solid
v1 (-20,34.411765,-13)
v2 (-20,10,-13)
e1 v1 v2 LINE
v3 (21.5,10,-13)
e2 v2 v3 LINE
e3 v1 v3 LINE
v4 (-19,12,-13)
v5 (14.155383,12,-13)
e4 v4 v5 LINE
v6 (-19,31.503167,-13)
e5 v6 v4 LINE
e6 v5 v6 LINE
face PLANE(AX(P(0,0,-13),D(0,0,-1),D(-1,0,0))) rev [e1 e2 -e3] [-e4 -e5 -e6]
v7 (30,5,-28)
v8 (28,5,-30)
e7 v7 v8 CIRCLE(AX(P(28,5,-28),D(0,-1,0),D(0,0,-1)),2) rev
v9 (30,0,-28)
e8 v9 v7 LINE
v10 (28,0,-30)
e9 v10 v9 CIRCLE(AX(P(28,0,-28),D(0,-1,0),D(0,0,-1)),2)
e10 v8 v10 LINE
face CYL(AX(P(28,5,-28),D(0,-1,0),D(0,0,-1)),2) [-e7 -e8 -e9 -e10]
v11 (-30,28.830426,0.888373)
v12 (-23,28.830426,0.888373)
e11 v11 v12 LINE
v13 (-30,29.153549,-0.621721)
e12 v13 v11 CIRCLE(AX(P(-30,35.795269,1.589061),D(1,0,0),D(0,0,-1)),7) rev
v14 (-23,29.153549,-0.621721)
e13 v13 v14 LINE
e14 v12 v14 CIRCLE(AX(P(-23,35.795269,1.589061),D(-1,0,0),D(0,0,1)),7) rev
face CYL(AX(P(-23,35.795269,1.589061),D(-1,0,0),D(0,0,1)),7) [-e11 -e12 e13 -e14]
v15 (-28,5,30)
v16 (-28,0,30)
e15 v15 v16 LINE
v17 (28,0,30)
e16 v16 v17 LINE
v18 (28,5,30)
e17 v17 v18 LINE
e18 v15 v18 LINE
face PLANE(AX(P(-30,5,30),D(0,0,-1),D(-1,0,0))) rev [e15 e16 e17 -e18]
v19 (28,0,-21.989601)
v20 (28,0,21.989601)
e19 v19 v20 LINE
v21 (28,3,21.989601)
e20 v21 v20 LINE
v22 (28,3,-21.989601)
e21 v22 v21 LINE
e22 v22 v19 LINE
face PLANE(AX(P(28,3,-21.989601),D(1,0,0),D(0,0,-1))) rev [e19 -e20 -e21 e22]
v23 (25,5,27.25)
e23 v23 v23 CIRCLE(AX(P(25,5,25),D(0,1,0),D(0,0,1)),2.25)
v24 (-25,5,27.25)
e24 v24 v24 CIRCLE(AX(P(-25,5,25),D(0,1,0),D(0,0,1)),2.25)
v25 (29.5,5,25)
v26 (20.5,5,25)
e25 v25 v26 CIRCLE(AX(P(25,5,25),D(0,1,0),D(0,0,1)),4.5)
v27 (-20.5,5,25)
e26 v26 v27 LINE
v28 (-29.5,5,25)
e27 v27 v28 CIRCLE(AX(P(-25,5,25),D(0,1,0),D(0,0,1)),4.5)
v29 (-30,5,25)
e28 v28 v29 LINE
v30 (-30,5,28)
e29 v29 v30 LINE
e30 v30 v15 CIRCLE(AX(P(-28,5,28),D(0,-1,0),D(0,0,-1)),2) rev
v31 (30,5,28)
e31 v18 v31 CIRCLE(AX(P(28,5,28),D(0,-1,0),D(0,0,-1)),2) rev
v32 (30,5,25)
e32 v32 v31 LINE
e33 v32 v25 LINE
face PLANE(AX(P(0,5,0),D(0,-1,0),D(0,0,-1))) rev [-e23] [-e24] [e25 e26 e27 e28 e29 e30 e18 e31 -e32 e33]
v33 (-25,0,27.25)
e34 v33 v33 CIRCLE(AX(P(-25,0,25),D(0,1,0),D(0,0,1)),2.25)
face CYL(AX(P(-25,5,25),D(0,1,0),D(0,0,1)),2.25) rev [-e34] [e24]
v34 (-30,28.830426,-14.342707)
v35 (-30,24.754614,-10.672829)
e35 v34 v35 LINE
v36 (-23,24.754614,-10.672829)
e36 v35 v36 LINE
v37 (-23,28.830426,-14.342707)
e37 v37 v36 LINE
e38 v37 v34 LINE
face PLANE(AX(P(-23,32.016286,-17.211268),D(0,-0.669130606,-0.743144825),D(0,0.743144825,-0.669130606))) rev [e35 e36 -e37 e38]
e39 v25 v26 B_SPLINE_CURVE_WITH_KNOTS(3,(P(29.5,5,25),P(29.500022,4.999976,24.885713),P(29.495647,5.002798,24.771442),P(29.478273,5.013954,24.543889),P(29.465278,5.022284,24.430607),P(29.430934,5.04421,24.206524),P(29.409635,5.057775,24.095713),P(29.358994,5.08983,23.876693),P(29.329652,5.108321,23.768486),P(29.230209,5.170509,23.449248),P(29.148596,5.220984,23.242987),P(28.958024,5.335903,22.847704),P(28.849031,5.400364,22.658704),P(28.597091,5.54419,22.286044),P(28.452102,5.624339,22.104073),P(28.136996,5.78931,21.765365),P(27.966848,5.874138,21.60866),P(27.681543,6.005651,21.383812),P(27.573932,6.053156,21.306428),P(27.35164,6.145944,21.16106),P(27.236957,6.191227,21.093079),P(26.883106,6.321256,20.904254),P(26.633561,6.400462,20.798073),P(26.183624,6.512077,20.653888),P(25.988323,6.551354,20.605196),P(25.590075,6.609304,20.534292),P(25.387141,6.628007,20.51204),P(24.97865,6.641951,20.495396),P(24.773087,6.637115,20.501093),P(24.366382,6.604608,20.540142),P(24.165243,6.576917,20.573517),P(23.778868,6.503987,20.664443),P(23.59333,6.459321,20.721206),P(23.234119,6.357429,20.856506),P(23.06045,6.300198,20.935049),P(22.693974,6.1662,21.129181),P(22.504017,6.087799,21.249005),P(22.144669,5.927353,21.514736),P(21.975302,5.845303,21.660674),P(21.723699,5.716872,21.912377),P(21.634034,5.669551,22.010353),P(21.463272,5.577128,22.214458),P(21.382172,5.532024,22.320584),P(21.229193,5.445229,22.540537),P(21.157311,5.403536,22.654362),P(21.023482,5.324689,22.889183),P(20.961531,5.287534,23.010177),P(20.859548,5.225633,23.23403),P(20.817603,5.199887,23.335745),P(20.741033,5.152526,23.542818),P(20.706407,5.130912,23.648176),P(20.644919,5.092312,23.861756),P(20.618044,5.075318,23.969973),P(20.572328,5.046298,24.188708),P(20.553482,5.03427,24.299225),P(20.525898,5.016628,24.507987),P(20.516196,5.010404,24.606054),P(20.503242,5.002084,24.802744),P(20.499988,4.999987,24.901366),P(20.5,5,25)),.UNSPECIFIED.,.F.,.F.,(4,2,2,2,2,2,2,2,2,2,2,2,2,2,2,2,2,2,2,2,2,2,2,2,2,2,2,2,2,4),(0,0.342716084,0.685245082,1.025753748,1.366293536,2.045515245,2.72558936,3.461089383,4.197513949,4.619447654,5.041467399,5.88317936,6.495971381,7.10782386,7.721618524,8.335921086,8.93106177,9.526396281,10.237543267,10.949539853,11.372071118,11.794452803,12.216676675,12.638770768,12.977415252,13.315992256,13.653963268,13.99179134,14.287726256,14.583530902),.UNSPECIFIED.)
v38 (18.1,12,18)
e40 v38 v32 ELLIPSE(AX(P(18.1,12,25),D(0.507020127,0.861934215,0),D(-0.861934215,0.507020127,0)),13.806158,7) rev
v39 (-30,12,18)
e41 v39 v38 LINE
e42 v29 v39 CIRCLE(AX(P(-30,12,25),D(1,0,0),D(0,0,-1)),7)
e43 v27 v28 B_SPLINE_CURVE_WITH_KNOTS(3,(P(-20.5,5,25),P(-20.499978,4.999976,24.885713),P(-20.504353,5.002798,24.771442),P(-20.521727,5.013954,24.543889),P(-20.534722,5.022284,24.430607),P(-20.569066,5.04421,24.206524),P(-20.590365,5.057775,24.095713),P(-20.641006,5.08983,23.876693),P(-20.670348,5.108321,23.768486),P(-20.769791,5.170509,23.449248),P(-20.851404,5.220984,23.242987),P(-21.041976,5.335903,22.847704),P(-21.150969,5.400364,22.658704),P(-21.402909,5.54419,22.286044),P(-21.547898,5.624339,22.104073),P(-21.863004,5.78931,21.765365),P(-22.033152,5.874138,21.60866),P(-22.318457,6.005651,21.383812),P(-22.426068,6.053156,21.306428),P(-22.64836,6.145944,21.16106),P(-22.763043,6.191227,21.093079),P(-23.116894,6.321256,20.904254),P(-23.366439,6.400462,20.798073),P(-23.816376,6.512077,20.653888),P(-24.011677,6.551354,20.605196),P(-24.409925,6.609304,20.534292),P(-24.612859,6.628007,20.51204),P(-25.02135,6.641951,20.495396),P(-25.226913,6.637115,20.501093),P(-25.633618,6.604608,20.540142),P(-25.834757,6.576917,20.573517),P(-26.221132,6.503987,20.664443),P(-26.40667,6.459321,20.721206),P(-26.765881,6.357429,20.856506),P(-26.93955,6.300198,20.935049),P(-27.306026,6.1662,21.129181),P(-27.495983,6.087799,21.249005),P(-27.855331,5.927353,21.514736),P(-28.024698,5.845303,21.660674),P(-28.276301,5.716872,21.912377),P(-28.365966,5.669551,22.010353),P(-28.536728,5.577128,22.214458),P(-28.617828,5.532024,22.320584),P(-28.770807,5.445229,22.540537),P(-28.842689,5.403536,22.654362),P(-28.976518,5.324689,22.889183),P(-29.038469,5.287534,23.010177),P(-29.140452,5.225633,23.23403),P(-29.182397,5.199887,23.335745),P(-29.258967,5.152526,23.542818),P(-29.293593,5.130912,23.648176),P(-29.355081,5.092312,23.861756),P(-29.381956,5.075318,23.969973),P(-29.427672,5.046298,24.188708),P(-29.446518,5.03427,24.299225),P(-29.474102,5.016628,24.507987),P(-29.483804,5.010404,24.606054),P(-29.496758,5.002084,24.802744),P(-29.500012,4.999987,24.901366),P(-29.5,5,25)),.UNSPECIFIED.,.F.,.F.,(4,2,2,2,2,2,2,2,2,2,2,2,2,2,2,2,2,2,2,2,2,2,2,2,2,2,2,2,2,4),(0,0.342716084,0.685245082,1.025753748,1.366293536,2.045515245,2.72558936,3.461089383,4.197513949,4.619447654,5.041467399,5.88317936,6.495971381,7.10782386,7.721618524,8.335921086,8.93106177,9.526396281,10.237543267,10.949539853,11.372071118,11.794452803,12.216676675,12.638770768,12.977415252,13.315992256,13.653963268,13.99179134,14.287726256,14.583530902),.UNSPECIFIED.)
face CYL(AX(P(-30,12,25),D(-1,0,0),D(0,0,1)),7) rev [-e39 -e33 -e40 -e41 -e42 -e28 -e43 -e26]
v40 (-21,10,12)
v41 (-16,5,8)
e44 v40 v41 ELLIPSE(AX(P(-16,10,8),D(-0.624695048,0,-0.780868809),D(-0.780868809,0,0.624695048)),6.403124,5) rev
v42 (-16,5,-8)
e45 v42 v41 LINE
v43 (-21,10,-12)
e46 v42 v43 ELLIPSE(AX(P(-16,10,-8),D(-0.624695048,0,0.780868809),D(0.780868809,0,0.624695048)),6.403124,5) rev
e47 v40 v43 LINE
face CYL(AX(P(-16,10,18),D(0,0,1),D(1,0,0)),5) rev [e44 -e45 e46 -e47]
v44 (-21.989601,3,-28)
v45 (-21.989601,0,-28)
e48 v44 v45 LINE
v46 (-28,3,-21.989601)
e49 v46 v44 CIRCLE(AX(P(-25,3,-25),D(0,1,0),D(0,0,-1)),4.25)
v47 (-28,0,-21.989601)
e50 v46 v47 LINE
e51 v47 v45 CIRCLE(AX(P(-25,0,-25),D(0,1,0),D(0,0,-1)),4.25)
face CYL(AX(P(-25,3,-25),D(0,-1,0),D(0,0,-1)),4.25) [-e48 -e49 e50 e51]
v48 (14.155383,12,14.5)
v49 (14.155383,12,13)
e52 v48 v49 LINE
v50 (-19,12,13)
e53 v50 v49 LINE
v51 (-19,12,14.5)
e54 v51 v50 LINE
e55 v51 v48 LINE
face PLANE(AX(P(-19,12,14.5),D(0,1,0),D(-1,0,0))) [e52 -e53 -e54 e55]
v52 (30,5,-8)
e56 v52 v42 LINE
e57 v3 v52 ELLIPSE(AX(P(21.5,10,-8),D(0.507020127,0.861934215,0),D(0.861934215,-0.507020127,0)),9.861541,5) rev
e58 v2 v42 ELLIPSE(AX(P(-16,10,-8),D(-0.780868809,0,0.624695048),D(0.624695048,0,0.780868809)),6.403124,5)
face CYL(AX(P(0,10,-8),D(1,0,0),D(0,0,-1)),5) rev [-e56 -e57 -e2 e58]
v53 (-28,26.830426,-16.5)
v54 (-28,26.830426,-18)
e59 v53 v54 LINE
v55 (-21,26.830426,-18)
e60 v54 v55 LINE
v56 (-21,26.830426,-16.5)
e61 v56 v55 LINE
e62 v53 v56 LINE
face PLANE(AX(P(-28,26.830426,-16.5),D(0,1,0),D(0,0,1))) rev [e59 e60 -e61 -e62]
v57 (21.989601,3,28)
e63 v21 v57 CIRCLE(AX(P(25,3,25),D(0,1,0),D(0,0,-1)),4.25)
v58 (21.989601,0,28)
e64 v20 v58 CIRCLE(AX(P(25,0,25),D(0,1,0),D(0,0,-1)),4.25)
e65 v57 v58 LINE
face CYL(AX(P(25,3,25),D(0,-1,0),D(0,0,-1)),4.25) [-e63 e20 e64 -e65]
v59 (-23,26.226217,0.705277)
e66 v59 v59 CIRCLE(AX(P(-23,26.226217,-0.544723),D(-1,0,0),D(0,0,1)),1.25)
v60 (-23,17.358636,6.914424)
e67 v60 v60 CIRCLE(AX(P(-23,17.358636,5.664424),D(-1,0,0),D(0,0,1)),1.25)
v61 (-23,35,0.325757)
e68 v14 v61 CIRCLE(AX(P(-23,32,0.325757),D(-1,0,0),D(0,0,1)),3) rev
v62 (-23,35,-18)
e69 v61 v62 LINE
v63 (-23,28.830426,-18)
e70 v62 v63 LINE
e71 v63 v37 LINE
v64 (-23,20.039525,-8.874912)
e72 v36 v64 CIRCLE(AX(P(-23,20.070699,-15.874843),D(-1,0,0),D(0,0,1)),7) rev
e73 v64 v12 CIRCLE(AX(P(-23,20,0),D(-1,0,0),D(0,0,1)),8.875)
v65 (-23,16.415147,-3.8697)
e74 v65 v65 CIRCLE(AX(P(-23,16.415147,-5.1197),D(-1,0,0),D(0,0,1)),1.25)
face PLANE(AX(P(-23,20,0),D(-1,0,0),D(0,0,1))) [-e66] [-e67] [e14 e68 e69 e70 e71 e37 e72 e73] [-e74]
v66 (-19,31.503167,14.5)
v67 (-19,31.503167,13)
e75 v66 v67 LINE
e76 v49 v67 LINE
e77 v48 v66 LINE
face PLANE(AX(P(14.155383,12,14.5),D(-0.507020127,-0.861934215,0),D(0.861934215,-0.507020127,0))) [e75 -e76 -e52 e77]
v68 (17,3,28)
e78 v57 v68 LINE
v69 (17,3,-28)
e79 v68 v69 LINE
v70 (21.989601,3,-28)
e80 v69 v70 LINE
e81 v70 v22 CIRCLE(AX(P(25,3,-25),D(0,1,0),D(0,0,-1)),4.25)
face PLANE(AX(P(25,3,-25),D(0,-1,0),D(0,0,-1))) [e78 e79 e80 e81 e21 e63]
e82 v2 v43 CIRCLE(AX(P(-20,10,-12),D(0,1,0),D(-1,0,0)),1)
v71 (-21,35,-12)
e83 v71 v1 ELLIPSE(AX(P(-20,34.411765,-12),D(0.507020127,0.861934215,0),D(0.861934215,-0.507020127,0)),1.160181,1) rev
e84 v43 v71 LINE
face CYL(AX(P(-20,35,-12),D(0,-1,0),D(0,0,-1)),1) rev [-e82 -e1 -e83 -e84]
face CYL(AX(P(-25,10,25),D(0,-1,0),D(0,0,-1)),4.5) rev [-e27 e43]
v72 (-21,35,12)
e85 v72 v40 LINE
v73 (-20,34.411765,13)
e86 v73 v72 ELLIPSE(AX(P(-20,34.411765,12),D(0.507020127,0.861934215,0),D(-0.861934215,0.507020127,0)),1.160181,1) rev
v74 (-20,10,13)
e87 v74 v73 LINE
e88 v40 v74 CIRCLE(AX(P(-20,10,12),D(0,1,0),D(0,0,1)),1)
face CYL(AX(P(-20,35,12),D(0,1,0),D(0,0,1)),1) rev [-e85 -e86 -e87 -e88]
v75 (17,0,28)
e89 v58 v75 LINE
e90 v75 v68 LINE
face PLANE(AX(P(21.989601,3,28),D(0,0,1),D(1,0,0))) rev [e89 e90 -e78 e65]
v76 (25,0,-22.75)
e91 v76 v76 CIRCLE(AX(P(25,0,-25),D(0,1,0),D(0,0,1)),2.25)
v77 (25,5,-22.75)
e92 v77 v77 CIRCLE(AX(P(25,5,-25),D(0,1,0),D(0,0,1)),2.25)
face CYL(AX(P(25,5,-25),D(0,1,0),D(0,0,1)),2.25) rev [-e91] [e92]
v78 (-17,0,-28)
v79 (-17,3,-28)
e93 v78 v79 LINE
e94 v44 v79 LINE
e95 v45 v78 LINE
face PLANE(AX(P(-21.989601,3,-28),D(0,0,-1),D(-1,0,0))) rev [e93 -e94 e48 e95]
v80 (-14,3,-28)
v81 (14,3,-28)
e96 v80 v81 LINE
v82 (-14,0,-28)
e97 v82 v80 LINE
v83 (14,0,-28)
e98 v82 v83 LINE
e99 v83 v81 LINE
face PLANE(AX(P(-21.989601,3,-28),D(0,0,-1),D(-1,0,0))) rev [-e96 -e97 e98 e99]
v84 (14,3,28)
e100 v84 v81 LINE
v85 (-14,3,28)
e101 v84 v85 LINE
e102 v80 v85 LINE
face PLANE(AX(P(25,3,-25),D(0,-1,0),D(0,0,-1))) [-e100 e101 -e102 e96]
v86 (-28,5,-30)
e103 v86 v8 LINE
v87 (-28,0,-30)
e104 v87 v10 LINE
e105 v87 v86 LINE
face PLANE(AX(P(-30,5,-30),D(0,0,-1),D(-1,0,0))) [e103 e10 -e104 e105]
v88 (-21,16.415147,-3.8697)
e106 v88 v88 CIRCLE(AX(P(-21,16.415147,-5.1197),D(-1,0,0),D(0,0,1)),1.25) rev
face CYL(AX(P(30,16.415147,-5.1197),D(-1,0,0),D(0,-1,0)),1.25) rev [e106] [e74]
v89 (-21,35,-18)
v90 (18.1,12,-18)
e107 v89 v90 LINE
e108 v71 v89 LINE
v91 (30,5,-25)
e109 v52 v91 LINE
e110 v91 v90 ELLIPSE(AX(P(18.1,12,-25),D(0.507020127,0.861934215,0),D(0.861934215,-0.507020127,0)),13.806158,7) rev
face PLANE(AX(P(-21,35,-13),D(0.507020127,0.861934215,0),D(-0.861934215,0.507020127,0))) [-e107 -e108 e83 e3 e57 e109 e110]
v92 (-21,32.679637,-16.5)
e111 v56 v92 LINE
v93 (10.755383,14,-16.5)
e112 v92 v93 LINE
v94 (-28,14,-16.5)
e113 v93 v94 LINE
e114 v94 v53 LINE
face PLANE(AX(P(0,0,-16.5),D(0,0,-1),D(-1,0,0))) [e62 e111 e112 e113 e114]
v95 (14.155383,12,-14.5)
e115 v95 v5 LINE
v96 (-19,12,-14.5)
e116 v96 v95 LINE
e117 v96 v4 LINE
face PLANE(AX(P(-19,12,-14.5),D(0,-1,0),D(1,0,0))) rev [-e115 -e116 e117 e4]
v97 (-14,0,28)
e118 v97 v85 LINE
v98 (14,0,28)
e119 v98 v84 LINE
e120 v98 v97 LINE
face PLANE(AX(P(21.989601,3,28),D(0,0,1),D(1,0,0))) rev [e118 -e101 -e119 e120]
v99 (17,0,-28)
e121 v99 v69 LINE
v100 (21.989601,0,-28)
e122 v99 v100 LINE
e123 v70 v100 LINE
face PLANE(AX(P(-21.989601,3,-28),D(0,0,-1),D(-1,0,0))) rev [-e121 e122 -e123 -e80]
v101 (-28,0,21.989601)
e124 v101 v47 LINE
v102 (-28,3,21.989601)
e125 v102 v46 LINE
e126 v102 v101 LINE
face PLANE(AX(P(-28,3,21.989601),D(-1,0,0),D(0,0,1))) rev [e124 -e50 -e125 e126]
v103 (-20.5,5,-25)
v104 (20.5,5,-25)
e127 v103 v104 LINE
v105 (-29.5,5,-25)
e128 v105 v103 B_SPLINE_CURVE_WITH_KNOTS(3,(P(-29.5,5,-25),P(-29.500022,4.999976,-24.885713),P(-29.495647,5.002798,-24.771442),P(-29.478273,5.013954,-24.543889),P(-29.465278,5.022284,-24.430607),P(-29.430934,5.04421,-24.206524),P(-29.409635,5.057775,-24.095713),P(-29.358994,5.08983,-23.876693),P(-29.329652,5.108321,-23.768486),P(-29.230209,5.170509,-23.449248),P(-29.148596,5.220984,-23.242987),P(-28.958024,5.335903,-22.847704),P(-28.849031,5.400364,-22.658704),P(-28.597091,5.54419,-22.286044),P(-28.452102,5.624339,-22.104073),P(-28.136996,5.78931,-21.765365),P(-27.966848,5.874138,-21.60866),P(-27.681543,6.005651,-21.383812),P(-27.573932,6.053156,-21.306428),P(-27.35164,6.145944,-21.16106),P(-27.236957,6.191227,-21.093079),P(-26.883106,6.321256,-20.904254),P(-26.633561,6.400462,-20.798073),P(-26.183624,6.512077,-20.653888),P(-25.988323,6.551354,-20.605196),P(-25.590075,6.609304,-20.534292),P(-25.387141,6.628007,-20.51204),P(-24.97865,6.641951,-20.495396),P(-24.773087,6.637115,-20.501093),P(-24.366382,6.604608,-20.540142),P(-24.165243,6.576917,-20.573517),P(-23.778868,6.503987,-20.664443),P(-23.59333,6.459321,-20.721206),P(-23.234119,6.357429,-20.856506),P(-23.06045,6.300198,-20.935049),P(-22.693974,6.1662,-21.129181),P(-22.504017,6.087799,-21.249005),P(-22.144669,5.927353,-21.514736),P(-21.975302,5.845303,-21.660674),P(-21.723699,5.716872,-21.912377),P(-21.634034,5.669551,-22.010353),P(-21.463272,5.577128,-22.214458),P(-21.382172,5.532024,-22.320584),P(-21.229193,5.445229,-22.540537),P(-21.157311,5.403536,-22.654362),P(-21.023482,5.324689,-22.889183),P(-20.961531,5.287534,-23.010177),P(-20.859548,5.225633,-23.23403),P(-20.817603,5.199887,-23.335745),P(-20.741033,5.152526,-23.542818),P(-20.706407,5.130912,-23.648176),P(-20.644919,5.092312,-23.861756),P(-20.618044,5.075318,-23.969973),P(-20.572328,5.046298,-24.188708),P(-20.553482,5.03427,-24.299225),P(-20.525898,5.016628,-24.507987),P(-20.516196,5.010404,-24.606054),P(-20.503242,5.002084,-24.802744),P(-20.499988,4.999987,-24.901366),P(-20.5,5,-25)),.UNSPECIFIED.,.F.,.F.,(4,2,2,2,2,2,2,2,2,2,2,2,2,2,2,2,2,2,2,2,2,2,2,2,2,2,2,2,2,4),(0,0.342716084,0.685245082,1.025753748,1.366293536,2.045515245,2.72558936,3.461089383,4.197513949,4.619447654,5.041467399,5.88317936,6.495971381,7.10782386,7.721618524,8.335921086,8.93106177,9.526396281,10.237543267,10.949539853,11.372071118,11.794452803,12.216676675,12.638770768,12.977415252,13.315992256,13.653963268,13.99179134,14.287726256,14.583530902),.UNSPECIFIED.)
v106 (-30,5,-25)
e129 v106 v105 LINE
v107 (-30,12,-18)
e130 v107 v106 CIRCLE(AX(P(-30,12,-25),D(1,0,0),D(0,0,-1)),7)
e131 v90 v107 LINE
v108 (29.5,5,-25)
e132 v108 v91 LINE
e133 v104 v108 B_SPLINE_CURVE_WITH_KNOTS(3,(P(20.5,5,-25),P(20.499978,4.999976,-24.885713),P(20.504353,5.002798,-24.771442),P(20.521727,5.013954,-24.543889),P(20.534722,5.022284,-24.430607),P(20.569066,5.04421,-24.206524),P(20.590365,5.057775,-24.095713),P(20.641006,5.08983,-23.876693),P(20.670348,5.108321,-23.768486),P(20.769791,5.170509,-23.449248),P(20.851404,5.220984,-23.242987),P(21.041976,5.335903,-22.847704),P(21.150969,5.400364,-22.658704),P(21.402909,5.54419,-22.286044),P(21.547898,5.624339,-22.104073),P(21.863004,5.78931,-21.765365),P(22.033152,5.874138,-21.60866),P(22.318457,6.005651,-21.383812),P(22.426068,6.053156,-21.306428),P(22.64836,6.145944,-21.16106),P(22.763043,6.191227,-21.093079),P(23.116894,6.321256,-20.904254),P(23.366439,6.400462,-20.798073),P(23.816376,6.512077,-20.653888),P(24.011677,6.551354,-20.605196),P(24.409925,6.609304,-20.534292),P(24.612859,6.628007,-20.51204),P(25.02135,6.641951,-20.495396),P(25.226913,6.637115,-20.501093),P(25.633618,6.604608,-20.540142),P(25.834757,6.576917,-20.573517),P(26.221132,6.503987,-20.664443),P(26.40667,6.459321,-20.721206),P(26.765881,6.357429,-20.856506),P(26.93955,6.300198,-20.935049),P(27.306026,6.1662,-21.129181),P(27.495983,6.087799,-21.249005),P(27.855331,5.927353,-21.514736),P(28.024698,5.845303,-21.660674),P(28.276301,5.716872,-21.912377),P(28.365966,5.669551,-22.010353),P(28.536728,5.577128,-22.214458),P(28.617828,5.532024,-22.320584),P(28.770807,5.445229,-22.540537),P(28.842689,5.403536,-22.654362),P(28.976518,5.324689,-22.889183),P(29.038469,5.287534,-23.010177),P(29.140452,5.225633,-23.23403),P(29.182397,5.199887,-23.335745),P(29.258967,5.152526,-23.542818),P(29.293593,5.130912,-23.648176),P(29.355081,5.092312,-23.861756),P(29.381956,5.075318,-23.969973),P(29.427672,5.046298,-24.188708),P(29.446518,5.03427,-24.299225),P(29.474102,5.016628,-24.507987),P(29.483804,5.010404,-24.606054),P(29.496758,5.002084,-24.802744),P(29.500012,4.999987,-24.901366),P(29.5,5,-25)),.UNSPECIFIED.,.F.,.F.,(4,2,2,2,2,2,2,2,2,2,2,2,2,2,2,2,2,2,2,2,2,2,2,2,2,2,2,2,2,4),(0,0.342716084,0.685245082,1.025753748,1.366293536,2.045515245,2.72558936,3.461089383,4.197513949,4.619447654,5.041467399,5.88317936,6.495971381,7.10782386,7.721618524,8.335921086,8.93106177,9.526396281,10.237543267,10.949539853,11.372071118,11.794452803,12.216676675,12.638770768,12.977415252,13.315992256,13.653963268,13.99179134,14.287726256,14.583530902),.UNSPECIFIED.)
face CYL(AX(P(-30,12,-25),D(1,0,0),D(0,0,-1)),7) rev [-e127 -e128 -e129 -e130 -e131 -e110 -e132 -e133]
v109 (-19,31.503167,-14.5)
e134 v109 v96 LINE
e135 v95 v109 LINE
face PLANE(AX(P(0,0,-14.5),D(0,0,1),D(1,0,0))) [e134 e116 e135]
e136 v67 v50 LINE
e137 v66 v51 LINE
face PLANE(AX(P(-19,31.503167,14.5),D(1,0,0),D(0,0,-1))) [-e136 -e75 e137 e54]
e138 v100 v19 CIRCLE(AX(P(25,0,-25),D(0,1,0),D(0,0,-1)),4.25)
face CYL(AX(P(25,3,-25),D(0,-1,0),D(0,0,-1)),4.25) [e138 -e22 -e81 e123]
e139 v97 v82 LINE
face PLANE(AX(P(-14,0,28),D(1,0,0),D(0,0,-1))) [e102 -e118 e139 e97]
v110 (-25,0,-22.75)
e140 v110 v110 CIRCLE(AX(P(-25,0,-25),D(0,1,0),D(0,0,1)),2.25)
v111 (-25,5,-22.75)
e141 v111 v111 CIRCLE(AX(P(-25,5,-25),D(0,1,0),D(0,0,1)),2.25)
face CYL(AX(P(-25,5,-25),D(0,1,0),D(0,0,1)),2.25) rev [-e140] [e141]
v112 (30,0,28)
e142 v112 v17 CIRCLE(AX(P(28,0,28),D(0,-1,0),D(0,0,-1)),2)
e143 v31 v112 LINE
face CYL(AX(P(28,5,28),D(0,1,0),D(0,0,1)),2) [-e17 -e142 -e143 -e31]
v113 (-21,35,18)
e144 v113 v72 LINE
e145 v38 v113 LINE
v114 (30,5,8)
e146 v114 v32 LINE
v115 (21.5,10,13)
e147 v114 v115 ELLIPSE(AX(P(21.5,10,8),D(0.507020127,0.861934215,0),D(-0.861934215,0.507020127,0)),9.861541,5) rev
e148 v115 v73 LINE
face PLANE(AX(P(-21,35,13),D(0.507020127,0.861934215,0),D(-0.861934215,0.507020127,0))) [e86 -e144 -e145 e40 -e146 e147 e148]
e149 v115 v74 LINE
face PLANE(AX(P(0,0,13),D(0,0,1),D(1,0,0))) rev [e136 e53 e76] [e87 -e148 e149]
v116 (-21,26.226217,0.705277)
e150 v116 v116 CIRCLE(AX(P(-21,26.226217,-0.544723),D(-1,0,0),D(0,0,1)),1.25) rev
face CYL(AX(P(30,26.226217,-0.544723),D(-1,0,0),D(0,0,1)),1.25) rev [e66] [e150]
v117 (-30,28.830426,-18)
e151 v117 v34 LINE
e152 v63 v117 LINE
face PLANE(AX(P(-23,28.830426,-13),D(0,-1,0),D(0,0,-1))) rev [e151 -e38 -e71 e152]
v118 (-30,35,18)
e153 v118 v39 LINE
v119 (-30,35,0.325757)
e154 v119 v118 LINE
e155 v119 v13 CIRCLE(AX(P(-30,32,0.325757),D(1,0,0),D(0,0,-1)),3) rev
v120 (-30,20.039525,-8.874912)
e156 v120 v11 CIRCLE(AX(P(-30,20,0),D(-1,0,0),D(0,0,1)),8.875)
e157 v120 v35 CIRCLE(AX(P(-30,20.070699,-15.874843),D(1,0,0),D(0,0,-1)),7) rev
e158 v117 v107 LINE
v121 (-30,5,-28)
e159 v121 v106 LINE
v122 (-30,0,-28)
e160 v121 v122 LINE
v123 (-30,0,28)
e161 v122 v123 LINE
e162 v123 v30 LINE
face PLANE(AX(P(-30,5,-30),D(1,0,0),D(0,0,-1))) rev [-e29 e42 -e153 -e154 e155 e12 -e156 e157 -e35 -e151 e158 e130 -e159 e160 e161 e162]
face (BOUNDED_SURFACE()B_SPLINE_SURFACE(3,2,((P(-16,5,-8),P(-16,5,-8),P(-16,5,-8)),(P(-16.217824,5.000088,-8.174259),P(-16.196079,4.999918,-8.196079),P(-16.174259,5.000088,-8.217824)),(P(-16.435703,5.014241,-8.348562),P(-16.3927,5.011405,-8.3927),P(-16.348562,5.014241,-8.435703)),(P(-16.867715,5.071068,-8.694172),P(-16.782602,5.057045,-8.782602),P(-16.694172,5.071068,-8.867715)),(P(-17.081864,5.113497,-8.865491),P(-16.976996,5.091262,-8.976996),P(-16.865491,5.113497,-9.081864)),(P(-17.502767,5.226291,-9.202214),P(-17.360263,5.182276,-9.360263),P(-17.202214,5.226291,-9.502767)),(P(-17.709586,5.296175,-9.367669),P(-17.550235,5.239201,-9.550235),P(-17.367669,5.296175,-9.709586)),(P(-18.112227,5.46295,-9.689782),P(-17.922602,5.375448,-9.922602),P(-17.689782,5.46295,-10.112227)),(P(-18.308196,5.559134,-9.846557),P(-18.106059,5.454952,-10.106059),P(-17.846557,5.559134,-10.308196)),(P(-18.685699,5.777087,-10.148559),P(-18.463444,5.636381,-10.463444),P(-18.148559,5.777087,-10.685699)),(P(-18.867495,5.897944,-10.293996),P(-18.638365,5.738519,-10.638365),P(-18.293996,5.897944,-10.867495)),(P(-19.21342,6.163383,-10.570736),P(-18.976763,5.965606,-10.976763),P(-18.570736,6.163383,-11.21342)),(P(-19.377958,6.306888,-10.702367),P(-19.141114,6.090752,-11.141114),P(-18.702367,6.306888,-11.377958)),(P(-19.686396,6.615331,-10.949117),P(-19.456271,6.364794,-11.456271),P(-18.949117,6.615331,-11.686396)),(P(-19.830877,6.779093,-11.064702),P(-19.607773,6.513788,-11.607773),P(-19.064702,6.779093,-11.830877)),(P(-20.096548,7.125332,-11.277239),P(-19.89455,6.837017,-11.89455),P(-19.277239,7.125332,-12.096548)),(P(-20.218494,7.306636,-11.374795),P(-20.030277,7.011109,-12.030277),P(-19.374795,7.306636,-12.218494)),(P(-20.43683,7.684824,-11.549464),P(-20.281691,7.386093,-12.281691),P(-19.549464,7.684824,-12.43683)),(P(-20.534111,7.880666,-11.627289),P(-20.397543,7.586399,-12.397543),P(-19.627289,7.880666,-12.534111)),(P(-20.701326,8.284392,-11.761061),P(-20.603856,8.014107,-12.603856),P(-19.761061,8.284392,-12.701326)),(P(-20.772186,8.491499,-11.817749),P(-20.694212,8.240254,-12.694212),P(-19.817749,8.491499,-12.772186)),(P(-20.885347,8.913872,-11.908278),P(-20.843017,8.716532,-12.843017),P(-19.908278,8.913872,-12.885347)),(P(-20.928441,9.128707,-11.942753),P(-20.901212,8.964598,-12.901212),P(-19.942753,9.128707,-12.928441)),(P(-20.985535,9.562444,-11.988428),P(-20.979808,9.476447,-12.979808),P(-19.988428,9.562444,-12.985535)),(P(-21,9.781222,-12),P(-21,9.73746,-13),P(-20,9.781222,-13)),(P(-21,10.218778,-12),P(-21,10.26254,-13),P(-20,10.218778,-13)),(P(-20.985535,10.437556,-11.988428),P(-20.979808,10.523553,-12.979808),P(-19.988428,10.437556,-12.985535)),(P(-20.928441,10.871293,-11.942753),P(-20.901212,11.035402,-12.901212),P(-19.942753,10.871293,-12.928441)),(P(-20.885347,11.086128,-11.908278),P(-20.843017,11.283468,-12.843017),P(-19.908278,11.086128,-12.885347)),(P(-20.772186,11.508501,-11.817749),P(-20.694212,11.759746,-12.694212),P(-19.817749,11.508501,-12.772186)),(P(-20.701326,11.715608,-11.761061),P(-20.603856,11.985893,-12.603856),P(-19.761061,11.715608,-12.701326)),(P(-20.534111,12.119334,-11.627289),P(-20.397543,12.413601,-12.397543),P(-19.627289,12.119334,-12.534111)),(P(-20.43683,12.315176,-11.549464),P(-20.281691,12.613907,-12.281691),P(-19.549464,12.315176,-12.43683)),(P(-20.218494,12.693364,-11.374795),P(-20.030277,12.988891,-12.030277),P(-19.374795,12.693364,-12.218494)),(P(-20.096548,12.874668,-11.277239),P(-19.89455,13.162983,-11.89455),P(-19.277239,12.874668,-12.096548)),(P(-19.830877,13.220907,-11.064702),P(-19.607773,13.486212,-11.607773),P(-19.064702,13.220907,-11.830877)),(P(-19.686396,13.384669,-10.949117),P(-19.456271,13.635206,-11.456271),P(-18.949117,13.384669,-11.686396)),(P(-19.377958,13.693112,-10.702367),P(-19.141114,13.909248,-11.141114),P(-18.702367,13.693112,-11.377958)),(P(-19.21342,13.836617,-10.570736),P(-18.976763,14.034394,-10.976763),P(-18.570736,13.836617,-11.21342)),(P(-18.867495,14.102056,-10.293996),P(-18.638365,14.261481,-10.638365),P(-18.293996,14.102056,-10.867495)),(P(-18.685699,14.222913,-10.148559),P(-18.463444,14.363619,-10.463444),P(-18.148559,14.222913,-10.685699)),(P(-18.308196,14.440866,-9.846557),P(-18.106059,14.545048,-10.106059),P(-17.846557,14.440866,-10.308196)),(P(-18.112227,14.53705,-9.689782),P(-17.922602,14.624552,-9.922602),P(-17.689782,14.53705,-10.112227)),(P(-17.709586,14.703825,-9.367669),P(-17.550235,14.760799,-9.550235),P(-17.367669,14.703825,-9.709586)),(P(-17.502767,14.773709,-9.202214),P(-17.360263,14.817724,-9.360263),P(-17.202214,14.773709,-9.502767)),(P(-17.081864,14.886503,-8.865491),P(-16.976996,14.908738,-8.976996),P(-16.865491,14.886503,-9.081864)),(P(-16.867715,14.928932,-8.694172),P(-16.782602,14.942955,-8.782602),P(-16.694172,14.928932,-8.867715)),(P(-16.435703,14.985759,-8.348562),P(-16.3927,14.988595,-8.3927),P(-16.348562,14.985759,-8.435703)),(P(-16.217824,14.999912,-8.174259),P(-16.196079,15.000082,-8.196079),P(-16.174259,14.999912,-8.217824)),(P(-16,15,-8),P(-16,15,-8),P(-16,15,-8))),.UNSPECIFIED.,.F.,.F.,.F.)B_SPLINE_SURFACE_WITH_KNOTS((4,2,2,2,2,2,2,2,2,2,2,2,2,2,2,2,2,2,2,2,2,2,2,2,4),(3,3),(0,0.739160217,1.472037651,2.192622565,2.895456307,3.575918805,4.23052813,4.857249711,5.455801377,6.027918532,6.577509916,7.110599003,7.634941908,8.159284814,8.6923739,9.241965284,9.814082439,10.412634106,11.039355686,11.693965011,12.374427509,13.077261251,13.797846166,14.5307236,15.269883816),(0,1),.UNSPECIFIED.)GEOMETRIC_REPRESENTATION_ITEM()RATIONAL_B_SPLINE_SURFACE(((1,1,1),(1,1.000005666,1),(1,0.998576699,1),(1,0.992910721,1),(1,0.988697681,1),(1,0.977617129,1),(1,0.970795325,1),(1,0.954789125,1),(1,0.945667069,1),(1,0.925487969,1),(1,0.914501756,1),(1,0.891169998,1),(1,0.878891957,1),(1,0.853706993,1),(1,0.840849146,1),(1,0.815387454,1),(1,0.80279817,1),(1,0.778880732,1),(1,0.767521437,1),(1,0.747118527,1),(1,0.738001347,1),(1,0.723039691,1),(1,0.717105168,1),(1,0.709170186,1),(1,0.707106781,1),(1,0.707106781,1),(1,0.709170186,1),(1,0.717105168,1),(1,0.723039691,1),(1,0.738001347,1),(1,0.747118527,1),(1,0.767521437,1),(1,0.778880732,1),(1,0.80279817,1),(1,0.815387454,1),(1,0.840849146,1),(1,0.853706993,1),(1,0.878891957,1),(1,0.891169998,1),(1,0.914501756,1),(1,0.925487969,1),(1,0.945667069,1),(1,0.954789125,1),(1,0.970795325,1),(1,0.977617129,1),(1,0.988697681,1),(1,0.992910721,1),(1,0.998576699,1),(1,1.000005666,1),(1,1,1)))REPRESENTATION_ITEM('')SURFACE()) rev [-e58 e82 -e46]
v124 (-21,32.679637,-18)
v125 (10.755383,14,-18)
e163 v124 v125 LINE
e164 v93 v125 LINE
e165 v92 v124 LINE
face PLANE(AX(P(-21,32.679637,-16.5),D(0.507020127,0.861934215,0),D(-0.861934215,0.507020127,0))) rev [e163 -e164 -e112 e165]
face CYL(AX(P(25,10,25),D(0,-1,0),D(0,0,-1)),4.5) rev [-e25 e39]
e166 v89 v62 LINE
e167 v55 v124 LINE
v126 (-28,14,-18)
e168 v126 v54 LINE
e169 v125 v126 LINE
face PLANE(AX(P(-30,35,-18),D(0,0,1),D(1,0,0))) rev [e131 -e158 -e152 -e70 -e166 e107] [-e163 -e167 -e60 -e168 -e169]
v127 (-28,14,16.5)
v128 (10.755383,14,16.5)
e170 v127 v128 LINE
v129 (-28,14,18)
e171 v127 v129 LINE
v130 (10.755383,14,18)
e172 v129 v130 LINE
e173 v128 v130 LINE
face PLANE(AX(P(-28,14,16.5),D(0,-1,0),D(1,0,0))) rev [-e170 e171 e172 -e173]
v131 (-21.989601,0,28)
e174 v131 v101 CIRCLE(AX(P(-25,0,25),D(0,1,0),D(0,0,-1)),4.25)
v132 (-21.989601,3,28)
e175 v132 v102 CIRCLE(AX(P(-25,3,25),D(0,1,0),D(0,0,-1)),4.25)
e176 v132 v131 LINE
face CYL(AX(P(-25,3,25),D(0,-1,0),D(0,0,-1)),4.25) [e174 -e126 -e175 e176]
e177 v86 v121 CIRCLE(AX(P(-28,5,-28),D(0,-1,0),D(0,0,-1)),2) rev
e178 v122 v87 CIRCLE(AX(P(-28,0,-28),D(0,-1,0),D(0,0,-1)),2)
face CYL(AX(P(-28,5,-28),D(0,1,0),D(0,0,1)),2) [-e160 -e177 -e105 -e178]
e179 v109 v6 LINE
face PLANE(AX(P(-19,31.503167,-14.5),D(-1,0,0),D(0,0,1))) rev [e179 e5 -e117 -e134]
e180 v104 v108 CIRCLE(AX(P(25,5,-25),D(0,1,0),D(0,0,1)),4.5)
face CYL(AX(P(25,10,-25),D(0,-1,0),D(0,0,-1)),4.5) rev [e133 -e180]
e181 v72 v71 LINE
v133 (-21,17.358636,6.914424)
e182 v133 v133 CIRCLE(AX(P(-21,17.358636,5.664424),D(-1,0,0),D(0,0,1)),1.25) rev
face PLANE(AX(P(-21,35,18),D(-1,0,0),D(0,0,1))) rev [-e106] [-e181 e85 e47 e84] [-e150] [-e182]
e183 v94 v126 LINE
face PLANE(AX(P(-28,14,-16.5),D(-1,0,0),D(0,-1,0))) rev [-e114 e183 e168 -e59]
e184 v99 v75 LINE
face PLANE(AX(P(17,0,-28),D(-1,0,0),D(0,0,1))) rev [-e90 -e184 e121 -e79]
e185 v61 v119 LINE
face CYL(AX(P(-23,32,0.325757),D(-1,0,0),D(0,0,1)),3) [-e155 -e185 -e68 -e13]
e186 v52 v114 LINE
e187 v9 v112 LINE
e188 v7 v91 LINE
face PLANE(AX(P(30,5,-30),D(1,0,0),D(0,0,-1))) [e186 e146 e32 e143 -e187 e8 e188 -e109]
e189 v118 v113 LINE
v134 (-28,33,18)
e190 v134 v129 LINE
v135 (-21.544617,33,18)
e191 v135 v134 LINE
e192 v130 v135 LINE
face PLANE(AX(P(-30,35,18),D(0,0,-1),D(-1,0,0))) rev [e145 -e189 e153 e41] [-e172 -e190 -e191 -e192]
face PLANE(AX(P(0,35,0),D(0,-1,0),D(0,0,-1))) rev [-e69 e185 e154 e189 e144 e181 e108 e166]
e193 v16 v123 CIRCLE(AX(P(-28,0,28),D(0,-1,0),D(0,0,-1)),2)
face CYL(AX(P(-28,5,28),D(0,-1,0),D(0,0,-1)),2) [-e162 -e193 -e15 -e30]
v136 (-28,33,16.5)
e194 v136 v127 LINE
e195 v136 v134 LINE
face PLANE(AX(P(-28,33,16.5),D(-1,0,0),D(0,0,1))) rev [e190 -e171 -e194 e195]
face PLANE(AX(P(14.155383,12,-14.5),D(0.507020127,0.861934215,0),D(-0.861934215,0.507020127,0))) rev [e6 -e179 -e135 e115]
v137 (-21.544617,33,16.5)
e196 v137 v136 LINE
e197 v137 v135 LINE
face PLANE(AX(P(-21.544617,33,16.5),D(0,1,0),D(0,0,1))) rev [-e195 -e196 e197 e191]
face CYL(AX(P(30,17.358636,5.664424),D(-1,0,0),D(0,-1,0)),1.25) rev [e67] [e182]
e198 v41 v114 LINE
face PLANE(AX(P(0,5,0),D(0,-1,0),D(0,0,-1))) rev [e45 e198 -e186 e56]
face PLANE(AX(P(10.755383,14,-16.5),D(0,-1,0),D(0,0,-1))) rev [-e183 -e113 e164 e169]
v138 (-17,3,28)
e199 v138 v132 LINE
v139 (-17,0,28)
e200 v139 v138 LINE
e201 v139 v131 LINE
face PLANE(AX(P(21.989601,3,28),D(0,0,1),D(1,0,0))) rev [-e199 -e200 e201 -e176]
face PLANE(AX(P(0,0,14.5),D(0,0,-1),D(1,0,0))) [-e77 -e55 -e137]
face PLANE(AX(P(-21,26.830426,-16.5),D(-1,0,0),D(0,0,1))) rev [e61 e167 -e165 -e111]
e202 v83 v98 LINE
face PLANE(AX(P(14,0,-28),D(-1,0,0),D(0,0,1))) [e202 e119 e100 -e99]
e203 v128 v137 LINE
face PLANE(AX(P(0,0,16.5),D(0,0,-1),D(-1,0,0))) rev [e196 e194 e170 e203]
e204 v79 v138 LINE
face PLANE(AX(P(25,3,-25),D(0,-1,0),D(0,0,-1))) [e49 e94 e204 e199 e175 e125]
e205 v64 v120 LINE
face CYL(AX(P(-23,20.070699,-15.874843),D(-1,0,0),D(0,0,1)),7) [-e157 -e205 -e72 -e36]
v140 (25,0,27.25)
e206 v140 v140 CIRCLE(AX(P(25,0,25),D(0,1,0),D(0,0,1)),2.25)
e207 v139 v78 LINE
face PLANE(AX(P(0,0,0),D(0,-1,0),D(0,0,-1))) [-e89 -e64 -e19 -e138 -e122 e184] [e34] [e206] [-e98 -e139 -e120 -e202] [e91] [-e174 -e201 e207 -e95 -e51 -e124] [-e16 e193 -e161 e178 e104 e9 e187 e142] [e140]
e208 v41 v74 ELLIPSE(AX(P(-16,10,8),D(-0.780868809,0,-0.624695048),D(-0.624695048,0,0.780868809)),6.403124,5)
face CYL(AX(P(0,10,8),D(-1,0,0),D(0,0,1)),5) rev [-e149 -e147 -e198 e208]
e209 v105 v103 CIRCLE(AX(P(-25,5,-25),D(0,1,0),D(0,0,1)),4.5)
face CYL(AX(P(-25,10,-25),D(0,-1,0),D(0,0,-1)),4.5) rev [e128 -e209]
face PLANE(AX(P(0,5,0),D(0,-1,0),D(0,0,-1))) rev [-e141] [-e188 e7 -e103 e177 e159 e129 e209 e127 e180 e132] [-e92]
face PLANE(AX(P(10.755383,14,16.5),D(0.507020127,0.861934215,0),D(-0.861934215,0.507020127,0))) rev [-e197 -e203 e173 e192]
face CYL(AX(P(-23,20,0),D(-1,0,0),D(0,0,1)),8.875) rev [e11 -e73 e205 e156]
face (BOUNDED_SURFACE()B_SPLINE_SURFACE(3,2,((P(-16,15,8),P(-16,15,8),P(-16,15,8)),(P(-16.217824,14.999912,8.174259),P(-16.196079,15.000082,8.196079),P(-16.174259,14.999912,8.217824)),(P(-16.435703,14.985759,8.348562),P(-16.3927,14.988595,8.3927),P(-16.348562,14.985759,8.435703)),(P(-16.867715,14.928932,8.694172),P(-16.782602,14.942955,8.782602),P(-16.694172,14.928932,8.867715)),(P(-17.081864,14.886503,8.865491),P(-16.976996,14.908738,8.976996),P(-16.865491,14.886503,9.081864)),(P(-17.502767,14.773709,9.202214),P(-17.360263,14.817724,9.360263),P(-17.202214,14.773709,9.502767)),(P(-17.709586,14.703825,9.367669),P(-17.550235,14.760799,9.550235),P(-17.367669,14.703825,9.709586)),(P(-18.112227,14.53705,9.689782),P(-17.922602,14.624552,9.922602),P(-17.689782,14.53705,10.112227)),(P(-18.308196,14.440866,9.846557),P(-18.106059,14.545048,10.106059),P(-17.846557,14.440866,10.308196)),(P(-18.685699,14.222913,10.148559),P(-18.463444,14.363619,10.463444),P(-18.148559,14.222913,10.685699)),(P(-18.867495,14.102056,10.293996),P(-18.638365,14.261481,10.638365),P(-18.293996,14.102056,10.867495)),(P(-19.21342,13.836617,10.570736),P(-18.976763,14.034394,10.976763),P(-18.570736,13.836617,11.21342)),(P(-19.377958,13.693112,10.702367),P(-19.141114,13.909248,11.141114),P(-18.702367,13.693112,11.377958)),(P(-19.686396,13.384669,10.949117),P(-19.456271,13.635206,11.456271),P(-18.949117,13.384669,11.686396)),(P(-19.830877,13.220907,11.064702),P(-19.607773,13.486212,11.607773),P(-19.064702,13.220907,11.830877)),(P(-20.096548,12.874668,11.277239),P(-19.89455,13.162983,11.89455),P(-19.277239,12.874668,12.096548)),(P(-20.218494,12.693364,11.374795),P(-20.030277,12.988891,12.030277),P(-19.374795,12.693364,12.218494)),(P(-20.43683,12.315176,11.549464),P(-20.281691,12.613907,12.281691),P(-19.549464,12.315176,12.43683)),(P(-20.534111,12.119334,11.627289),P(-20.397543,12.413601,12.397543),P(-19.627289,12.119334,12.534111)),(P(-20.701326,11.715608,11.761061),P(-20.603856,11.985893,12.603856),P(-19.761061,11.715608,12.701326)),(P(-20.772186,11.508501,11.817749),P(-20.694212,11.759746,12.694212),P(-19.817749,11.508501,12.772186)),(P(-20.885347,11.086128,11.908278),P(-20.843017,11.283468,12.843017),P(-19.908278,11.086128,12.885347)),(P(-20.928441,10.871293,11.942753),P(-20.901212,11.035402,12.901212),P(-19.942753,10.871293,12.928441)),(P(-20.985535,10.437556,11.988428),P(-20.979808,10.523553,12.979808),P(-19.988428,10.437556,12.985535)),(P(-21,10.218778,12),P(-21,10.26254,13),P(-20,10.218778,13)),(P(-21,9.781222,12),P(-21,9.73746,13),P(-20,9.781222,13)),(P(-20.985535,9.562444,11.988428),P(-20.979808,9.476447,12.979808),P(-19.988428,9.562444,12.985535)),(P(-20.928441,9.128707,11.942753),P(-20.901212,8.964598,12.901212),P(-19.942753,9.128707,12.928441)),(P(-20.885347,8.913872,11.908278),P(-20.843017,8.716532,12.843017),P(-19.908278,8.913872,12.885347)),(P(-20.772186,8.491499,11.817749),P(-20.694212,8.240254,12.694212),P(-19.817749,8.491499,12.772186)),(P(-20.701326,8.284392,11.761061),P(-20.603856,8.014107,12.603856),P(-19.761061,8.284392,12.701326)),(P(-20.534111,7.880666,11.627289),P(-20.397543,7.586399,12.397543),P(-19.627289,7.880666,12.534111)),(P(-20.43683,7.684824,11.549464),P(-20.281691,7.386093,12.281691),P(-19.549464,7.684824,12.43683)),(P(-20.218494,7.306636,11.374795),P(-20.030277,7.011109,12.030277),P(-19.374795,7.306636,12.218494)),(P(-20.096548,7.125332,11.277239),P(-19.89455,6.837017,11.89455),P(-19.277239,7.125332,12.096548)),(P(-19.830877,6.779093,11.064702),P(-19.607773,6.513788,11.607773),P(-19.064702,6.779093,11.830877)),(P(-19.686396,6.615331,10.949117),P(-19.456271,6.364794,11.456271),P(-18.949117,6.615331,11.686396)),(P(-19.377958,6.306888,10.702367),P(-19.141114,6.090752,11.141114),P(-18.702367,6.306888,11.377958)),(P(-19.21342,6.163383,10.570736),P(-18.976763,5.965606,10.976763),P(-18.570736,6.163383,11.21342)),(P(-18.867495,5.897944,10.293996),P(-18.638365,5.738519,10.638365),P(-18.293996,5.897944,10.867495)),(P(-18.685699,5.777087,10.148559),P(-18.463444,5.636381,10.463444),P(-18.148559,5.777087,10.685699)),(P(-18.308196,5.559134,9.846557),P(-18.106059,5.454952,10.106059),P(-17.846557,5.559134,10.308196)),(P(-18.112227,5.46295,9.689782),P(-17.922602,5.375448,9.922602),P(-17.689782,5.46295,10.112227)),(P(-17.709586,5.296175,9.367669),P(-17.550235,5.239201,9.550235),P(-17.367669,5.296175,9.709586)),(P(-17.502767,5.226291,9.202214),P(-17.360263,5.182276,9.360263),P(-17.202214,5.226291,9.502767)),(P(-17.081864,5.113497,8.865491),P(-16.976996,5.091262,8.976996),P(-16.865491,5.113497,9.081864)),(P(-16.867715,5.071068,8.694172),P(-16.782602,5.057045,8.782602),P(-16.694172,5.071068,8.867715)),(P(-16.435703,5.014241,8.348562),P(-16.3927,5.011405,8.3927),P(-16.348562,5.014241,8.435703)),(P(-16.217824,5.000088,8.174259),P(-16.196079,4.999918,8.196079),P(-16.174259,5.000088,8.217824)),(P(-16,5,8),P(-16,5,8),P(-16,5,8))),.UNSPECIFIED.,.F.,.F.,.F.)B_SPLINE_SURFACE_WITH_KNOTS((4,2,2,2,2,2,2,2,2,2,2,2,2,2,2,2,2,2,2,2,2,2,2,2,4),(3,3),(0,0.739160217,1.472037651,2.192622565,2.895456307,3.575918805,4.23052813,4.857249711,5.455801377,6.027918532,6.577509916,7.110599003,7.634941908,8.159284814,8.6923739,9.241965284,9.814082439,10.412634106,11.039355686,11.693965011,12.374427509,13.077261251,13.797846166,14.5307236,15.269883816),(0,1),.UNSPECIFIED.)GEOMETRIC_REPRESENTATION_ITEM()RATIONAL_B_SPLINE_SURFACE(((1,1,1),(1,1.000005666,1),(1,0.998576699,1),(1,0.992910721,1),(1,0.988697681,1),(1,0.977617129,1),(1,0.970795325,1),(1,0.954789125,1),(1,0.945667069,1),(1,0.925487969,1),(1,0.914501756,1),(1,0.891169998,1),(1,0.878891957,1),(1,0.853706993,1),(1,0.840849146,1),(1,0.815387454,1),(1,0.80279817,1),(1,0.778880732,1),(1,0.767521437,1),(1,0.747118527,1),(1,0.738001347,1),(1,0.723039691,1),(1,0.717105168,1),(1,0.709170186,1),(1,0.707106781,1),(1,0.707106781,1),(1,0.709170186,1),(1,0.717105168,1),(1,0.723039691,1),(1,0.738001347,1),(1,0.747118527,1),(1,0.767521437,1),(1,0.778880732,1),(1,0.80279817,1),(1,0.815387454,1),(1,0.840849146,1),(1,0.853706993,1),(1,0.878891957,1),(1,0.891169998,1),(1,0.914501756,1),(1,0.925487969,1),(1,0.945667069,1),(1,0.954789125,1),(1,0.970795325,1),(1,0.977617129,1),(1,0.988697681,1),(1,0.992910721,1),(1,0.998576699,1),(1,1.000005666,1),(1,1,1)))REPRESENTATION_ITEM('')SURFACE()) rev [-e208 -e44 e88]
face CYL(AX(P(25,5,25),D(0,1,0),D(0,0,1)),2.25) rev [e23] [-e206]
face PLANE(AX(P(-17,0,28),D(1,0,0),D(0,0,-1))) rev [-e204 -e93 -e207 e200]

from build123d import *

# Parameters (mm, degrees)
SKETCH2_W                     = 60
SKETCH2_H                     = 60
BOSS_EXTRUDE1_DEPTH           = 5
SKETCH5_W                     = 9
SKETCH5_H                     = 36
BOSS_EXTRUDE2_DEPTH           = 30
BOSS_EXTRUDE3_DEPTH           = 5
BOSS_EXTRUDE4_DEPTH           = 5
FILLET6_R                     = 7
SKETCH4_W                     = 2.25
SKETCH4_H                     = 5
M4_CLEARANCE_HOLE2_AT_2_COUNT = 2
M4_CLEARANCE_HOLE2_AT_2_PITCH = 70.710678119
M4_CLEARANCE_HOLE2_AT_3_COUNT = 2
M4_CLEARANCE_HOLE2_AT_3_PITCH = 50
M4_CLEARANCE_HOLE2_AT_4_COUNT = 2
M4_CLEARANCE_HOLE2_AT_4_PITCH = 50
SKETCH17_R                    = 4.5
CUT_EXTRUDE7_DEPTH            = 5
CUT_EXTRUDE8_DEPTH            = 3
RIB9_REACH                    = 57
SKETCH19_WALLS_W              = 3
SKETCH19_WALLS_H              = 168.00000011
FILLET7_R                     = 5
CUT_EXTRUDE10_DEPTH           = 1.5
FILLET8_R                     = 1
SKETCH23_R                    = 1.25
CUT_EXTRUDE12_DEPTH           = 76.663729878
CIRPATTERN2_COUNT             = 3
FILLET10_R                    = 2
SKETCH24_R                    = 8.875
CUT_EXTRUDE13_DEPTH           = 7
CUT_EXTRUDE14_DEPTH           = 7
FILLET11_R                    = 7
SKETCH27_W                    = 5
SKETCH27_H                    = 6.169574238
CUT_EXTRUDE17_DEPTH           = 7
CUT_EXTRUDE18_DEPTH           = 1.5
CUT_EXTRUDE19_DEPTH           = 1.5
FILLET13_R                    = 3


with BuildPart() as part:
    # Sketch2 → Boss-Extrude1 (new body)
    with BuildSketch(Plane(origin=(0, 0, 0), x_dir=(1, 0, 0), z_dir=(0, 1, 0))):
        Rectangle(SKETCH2_W, SKETCH2_H)
    extrude(amount=BOSS_EXTRUDE1_DEPTH)

    # Sketch5 → Boss-Extrude2 (add)
    with BuildSketch(Plane(origin=(0, 5, 0), x_dir=(1, 0, 0), z_dir=(0, 1, 0))):
        with Locations((-25.5, 0)):
            Rectangle(SKETCH5_W, SKETCH5_H)
    extrude(amount=BOSS_EXTRUDE2_DEPTH)

    # Sketch6 → Boss-Extrude3 (add)
    with BuildSketch(Plane.XY.offset(18)):
        Polygon((-21, 35), (30, 5), (-21, 5), align=None)
    extrude(amount=-BOSS_EXTRUDE3_DEPTH)

    # Sketch15 → Boss-Extrude4 (add)
    with BuildSketch(Plane(origin=(0, 0, -18), x_dir=(-1, 0, 0), z_dir=(0, 0, -1))):
        Polygon((21, 5), (21, 35), (-30, 5), align=None)
    extrude(amount=-BOSS_EXTRUDE4_DEPTH)

    # Fillet6
    fillet6_edges = [part.edges().sort_by_distance(p)[0] for p in [
        (0, 5, 18),
        (0, 5, -18),
    ]]
    fillet(fillet6_edges, radius=FILLET6_R)

    # Sketch4 → M4 Clearance Hole2 (revolve, cut)
    with BuildSketch(Plane(origin=(25, 5, -25), x_dir=(0, 0, 1), z_dir=(1, 0, 0))):
        with Locations((1.125, 2.5)):
            Rectangle(SKETCH4_W, SKETCH4_H)
    m4_clearance_hole2 = revolve(axis=Axis((25, 11.35, -25), (0, -1, 0)), mode=Mode.SUBTRACT)

    # M4 Clearance Hole2 at 2: M4 Clearance Hole2 ×2
    with Locations(*[Vector(-0.7071067811865476, 0, 0.7071067811865476) * (i * M4_CLEARANCE_HOLE2_AT_2_PITCH) for i in range(1, M4_CLEARANCE_HOLE2_AT_2_COUNT)]):
        add(m4_clearance_hole2, mode=Mode.SUBTRACT)

    # M4 Clearance Hole2 at 3: M4 Clearance Hole2 ×2
    with Locations(*[(-i * M4_CLEARANCE_HOLE2_AT_3_PITCH, 0, 0) for i in range(1, M4_CLEARANCE_HOLE2_AT_3_COUNT)]):
        add(m4_clearance_hole2, mode=Mode.SUBTRACT)

    # M4 Clearance Hole2 at 4: M4 Clearance Hole2 ×2
    with Locations(*[(0, 0, i * M4_CLEARANCE_HOLE2_AT_4_PITCH) for i in range(1, M4_CLEARANCE_HOLE2_AT_4_COUNT)]):
        add(m4_clearance_hole2, mode=Mode.SUBTRACT)

    # Sketch17 → Cut-Extrude7 (cut)
    with BuildSketch(Plane(origin=(0, 5, 0), x_dir=(1, 0, 0), z_dir=(0, 1, 0))):
        with Locations((25, -25)):
            Circle(SKETCH17_R)
        with Locations((-25, -25)):
            Circle(SKETCH17_R)
        with Locations((-25, 25)):
            Circle(SKETCH17_R)
        with Locations((25, 25)):
            Circle(SKETCH17_R)
    extrude(amount=CUT_EXTRUDE7_DEPTH, mode=Mode.SUBTRACT)

    # Sketch18 → Cut-Extrude8 (cut)
    with BuildSketch(Plane.XZ):
        with BuildLine():
            Line((-28, 21.989601355), (-28, -21.989601355))
            ThreePointArc((-28, -21.989601355), (-21.99479618, -21.99479618), (-21.989601355, -28))
            Line((-21.989601355, -28), (21.989601355, -28))
            ThreePointArc((21.989601355, -28), (21.99479618, -21.99479618), (28, -21.989601355))
            Line((28, -21.989601355), (28, 21.989601355))
            ThreePointArc((28, 21.989601355), (21.99479618, 21.99479618), (21.989601355, 28))
            Line((21.989601355, 28), (-21.989601355, 28))
            ThreePointArc((-21.989601355, 28), (-21.99479618, 21.99479618), (-28, 21.989601355))
        make_face()
    extrude(amount=-CUT_EXTRUDE8_DEPTH, mode=Mode.SUBTRACT)

    # Sketch19 walls → Rib9 (add, up to next)
    with BuildSketch(Plane.XZ, mode=Mode.PRIVATE) as rib9_sk1:
        with Locations((15.5, 0)):
            Rectangle(SKETCH19_WALLS_W, SKETCH19_WALLS_H)
    rib9_tool1 = extrude(rib9_sk1.sketch, amount=-RIB9_REACH, mode=Mode.PRIVATE) - part.part
    # Sketch19 walls → Rib9 (add, up to next)
    with BuildSketch(Plane.XZ, mode=Mode.PRIVATE) as rib9_sk2:
        with Locations((-15.5, 0)):
            Rectangle(SKETCH19_WALLS_W, SKETCH19_WALLS_H)
    rib9_tool2 = extrude(rib9_sk2.sketch, amount=-RIB9_REACH, mode=Mode.PRIVATE) - part.part
    add(rib9_tool1.solids().sort_by_distance((15.5, 0, 0))[0])
    add(rib9_tool2.solids().sort_by_distance((-15.5, 0, 0))[0])

    # Fillet7
    # the kernel refuses this fillet: 5 mm, written as the material it adds along each edge
    with BuildSketch(Plane(origin=(-21, 5, 13), x_dir=(1, 0, 0), z_dir=(0, 0, -1))) as fillet7_piece_1:
        with BuildLine():
            CenterArc((FILLET7_R, -FILLET7_R), FILLET7_R, 90, 90)
            Line((0, -FILLET7_R), (0, 0))
            Line((0, 0), (FILLET7_R, 0))
        make_face()
    extrude(amount=26)
    with BuildSketch(Plane(origin=(42.5, 5, 13), x_dir=(0, 0, -1), z_dir=(-1, 0, 0))) as fillet7_piece_2_section:
        with BuildLine():
            CenterArc((FILLET7_R, -FILLET7_R), FILLET7_R, 90, 90)
            Line((0, -FILLET7_R), (0, 0))
            Line((0, 0), (FILLET7_R, 0))
        make_face()
    fillet7_piece_2 = extrude(amount=63.5, mode=Mode.PRIVATE)
    fillet7_piece_2 = split(fillet7_piece_2, bisect_by=Plane(origin=(9.894433322, 16.826803928, 11.865257735), z_dir=(-0.5070201265633938, -0.8619342151577696, 0)), keep=Keep.TOP, mode=Mode.PRIVATE)
    add(fillet7_piece_2)
    with BuildSketch(Plane(origin=(42.5, 5, -13), x_dir=(0, 0, 1), z_dir=(-1, 0, 0))) as fillet7_piece_3_section:
        with BuildLine():
            CenterArc((FILLET7_R, FILLET7_R), FILLET7_R, 180, 90)
            Line((0, FILLET7_R), (0, 0))
            Line((0, 0), (FILLET7_R, 0))
        make_face()
    fillet7_piece_3 = extrude(amount=63.5, mode=Mode.PRIVATE)
    fillet7_piece_3 = split(fillet7_piece_3, bisect_by=Plane(origin=(9.894433322, 16.826803928, -11.865257735), z_dir=(-0.5070201265633937, -0.8619342151577696, 0)), keep=Keep.TOP, mode=Mode.PRIVATE)
    add(fillet7_piece_3)

    # Sketch21 → Cut-Extrude10 (cut)
    with BuildSketch(Plane.XY.offset(-13)):
        Polygon((-19, 31.503166715), (-19, 12), (14.155383415, 12), align=None)
    cut_extrude10 = extrude(amount=-CUT_EXTRUDE10_DEPTH, mode=Mode.SUBTRACT)

    # Fillet8
    fillet8_edges = [part.edges().sort_by_distance(p)[0] for p in [
        (-21, 22.5, 13),
        (-21, 22.5, -13),
        (-19.230244537, 6.183519916, 11.230244537),
        (-19.230244537, 6.183519916, -11.230244537),
    ]]
    fillet(fillet8_edges, radius=FILLET8_R)

    # Mirror3: Cut-Extrude10 across plane
    add(cut_extrude10.mirror(Plane.XY), mode=Mode.SUBTRACT)

    # Sketch23 → Cut-Extrude12 (cut, through all)
    with BuildSketch(Plane(origin=(-30, 0, 0), x_dir=(0, 0, -1), z_dir=(1, 0, 0))):
        with Locations(Location((0.544723392, 26.226216863, 0), (0, 0, 180))):
            Circle(SKETCH23_R)
    cut_extrude12 = extrude(amount=CUT_EXTRUDE12_DEPTH, mode=Mode.SUBTRACT)

    # CirPattern2: Cut-Extrude12 ×3 about axis
    cirpattern2_axis = Axis((0, 20, 0), (1, 0, 0))
    for i in range(1, CIRPATTERN2_COUNT):
        add(cut_extrude12.rotate(cirpattern2_axis, i * 360 / CIRPATTERN2_COUNT), mode=Mode.SUBTRACT)

    # Fillet10
    fillet10_edges = [part.edges().sort_by_distance(p)[0] for p in [
        (-30, 2.5, -30),
        (-30, 2.5, 30),
        (30, 2.5, 30),
        (30, 2.5, -30),
    ]]
    fillet(fillet10_edges, radius=FILLET10_R)

    # Sketch24 → Cut-Extrude13 (cut)
    with BuildSketch(Plane.ZY.offset(30)):
        with Locations((0, 20)):
            Circle(SKETCH24_R)
    extrude(amount=-CUT_EXTRUDE13_DEPTH, mode=Mode.SUBTRACT)

    # Sketch25 → Cut-Extrude14 (cut)
    with BuildSketch(Plane.ZY.offset(30)):
        Polygon((-1.486450158, 28.74963376), (-10.151392059, 38.373026676), (-17.792172557, 39.760209508), (-17.211267901, 32.016285915), (-8.546326, 22.392892999), align=None)
    extrude(amount=-CUT_EXTRUDE14_DEPTH, mode=Mode.SUBTRACT)

    # Fillet11
    fillet11_edges = [part.edges().sort_by_distance(p)[0] for p in [
        (-26.5, 28.74963376, -1.486450158),
        (-26.5, 22.392892999, -8.546326),
    ]]
    fillet(fillet11_edges, radius=FILLET11_R)

    # Sketch27 → Cut-Extrude17 (cut)
    with BuildSketch(Plane.ZY.offset(30)):
        with Locations((-15.5, 31.915212881)):
            Rectangle(SKETCH27_W, SKETCH27_H)
    extrude(amount=-CUT_EXTRUDE17_DEPTH, mode=Mode.SUBTRACT)

    # Sketch28 → Cut-Extrude18 (cut)
    with BuildSketch(Plane(origin=(0, 0, -18), x_dir=(-1, 0, 0), z_dir=(0, 0, -1))):
        Polygon((28, 14), (28, 26.830425762), (21, 26.830425762), (21, 32.679637303), (-10.755383415, 14), align=None)
    extrude(amount=-CUT_EXTRUDE18_DEPTH, mode=Mode.SUBTRACT)

    # Sketch29 → Cut-Extrude19 (cut)
    with BuildSketch(Plane.XY.offset(18)):
        Polygon((10.755383415, 14), (-21.544616585, 33), (-28, 33), (-28, 14), align=None)
    extrude(amount=-CUT_EXTRUDE19_DEPTH, mode=Mode.SUBTRACT)

    # Fillet13
    # the kernel refuses this fillet: 3 mm, written as the material it takes off along each edge
    with BuildSketch(Plane(origin=(-51.842425733, 35, -7.114305199), x_dir=(0, -0.6691623373486353, 0.7431162535391829), z_dir=(1, 0, 0))) as fillet13_piece_1:
        with BuildLine():
            CenterArc((7.536318289, -2.749260767), FILLET13_R, 66.408234173, 161.58931935)
            Line((5.528831277, -4.978609528), (5.328082575, -5.201544404))
            Line((5.328082575, -5.201544404), (-0.200748701, -0.222934876))
            Line((-0.200748701, -0.222934876), (-0.031345799, 0.298357907))
            ThreePointArc((-0.031345799, 0.298357907), (5.172701164, 0.845100622), (8.857035494, 0.274926077))
            Line((8.857035494, 0.274926077), (8.736970293, 0))
        make_face()
    extrude(amount=28.842425733, mode=Mode.SUBTRACT)


solid = part.part
